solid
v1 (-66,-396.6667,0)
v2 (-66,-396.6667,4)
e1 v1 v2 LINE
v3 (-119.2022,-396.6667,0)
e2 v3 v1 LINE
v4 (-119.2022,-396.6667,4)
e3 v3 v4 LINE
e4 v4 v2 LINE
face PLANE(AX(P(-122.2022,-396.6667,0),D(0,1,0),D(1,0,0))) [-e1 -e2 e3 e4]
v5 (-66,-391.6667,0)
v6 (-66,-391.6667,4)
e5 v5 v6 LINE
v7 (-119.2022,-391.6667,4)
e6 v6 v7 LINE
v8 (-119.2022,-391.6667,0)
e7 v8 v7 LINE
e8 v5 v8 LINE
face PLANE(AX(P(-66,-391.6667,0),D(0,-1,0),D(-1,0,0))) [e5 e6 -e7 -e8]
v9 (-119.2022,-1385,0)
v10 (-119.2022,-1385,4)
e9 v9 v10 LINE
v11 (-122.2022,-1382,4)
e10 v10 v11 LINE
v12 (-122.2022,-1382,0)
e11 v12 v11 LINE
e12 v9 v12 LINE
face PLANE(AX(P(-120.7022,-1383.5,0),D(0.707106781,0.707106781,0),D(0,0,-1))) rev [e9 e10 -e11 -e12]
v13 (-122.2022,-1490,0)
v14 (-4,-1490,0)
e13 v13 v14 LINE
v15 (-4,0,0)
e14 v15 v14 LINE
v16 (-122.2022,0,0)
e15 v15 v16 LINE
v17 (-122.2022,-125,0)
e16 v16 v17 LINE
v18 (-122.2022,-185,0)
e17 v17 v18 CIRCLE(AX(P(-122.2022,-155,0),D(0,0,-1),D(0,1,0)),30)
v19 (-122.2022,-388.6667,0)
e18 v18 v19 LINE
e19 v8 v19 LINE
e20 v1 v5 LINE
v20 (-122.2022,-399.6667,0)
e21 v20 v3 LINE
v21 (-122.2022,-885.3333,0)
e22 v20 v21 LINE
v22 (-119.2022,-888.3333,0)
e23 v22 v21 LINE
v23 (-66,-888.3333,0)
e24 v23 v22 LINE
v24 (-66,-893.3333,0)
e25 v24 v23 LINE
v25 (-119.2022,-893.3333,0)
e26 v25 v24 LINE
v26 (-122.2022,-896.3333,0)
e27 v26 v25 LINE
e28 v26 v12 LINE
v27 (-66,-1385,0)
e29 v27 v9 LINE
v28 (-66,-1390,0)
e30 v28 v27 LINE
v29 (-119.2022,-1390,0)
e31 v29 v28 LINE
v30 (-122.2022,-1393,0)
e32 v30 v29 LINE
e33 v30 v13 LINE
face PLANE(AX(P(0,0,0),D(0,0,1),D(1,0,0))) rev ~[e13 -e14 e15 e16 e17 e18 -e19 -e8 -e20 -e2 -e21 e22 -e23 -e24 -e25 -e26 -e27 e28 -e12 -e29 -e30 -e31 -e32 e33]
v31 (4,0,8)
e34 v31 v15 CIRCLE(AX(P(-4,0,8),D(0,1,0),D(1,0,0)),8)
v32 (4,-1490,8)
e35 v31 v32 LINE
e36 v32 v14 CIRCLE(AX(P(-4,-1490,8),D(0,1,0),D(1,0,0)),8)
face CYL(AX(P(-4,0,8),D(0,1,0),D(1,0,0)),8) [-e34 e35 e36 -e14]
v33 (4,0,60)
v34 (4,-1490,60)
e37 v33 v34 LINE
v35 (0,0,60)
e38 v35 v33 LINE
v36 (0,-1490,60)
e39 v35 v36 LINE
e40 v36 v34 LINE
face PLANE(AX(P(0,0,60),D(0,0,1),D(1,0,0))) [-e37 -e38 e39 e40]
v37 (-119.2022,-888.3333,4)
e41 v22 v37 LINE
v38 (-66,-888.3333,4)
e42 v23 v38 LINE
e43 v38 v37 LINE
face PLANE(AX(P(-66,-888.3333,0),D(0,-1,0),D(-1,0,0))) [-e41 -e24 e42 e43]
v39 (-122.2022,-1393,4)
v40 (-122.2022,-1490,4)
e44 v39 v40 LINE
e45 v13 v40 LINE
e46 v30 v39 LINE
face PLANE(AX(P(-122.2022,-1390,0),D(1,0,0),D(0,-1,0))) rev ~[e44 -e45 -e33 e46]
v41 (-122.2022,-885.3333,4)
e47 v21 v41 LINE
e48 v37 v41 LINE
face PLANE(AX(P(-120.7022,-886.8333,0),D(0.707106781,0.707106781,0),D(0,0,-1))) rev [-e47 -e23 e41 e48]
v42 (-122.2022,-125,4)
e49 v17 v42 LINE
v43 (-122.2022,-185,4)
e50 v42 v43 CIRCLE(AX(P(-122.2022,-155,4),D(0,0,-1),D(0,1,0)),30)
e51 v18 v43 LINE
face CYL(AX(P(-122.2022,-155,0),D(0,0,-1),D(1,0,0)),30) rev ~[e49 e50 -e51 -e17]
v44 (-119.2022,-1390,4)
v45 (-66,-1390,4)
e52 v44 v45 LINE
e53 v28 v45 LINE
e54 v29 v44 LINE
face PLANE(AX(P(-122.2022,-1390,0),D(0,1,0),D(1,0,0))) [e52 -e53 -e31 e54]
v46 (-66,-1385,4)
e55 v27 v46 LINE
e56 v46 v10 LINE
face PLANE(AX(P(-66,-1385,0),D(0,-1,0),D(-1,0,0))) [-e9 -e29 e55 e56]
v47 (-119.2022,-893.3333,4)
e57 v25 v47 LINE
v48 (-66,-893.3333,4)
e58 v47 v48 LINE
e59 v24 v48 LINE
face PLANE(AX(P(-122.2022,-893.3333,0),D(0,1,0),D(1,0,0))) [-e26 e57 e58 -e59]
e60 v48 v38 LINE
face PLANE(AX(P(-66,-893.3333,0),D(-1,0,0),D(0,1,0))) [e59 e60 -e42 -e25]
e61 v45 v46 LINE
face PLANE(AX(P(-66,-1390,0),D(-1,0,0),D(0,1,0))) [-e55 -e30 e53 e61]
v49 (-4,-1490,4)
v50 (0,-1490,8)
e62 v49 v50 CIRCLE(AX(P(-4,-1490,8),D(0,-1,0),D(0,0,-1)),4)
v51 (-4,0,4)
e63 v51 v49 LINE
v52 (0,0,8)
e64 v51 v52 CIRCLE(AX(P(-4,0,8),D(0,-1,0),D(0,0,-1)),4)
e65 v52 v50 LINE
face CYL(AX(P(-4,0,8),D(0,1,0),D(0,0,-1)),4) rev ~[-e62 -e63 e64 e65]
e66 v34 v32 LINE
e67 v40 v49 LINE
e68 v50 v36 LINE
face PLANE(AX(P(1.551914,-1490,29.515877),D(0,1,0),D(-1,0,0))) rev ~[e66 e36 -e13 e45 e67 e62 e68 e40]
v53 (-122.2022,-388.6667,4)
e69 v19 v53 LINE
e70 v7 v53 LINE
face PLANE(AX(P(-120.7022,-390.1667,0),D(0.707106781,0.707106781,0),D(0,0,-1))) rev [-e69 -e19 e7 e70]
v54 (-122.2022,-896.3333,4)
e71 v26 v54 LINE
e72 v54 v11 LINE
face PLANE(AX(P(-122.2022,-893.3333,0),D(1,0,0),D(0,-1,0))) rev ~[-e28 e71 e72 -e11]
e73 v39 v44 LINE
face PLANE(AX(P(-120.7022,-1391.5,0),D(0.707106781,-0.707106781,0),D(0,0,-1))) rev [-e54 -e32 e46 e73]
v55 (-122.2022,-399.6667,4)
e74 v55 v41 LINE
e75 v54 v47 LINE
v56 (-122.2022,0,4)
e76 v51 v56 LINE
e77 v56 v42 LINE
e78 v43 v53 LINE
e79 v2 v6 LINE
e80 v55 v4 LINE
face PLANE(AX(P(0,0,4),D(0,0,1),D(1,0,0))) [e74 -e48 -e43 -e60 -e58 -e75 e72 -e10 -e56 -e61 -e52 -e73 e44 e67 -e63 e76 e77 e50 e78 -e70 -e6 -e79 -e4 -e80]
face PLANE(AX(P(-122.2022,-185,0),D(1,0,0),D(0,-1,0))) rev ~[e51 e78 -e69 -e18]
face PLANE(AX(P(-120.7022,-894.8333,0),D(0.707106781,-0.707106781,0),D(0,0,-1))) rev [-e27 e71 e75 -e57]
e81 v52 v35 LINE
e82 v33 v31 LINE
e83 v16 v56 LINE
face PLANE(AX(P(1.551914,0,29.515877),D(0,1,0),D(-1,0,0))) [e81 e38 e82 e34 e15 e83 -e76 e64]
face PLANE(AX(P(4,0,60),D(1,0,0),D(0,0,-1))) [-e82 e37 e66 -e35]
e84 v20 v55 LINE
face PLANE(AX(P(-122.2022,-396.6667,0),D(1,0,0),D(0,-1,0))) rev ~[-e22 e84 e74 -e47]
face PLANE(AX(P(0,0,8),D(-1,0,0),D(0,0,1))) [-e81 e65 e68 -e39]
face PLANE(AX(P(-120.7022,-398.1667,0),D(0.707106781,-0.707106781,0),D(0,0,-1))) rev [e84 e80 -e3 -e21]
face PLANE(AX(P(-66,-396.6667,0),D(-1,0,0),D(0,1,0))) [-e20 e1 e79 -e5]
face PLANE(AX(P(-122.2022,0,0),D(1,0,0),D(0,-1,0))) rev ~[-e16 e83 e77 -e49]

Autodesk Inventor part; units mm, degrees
ref_plane "YZ Plane" through (0, 0, 0) normal (1, 0, 0) x (0, 1, 0)
ref_plane "XZ Plane" through (0, 0, 0) normal (0, 1, 0) x (-1, 0, 0)
ref_plane "XY Plane" through (0, 0, 0) normal (0, 0, 1) x (1, 0, 0)
sketch "Sketch1" plane through (0, 0, 0) normal (0, 0, 1) x (1, 0, 0)
  line L0 (0, 0) -> (-122.2022, 0)
  line L1 (-122.2022, 0) -> (-122.2022, -1490)
  line L2 (-122.2022, -1490) -> (0, -1490)
  line L3 (0, -1490) -> (0, 0)
  line L4 (-122.2022, -1390) -> (-66, -1390)
  line L5 (-66, -1390) -> (-66, -1385)
  line L6 (-66, -1385) -> (-122.2022, -1385)
  line L7 (-122.2022, -1385) -> (-122.2022, -1390)
  line L8 (-122.2022, -893.3333) -> (-66, -893.3333)
  line L9 (-66, -893.3333) -> (-66, -888.3333)
  line L10 (-66, -888.3333) -> (-122.2022, -888.3333)
  line L11 (-122.2022, -888.3333) -> (-122.2022, -893.3333)
  line L12 (-122.2022, -396.6667) -> (-66, -396.6667)
  line L13 (-66, -396.6667) -> (-66, -391.6667)
  line L14 (-66, -391.6667) -> (-122.2022, -391.6667)
  line L15 (-122.2022, -391.6667) -> (-122.2022, -396.6667)
  circle A0 centre (-122.2022, -155) radius 30
  point P0 (-122.2022, -1385)
  point P1 (-122.2022, -125)
  point P2 (-122.2022, -185)
  dimension "d0" = 1490
  dimension "d1" = 122.2022
  dimension "d2" = 5
  dimension "d4" = 100
  dimension "d7" = 496.6667
  dimension "d23" = 66
  dimension "d28" = 60
  dimension "d29" = 1335
extrude "Plate1" add sketch "Sketch1" along normal blind 4 contours L3 L2 L1 L4 L5 L6 L8 L9 L10 L12 L13 L14 A0 L0
sketch "Sketch2" plane through (4, 0, 0) normal (-1, 0, 0) x (0, -1, 0)
  line L0 (1490, 0) -> (0, 0)
  line L1 (0, 0) -> (0, 60)
  line L2 (0, 60) -> (1490, 60)
  line L3 (1490, 60) -> (1490, 0)
edge flange "Flange1" height 60 angle 90 thickness 4 bend radius 4 thickness toward (-1, 0, 0) relief tear relief width 4 relief depth 2 edges at (0, -745, 4) wall of the first edge with corners at (4, -1490, 0) (4, 0, 0) (4, 0, 60) (4, -1490, 60)
bend "Bend1"
corner "Corner1"
chamfer "Corner Chamfer1" distance 3 angle 45 6 edges at (-122.2022, -1390, 2) (-122.2022, -1385, 2) (-122.2022, -893.3333, 2) (-122.2022, -888.3333, 2) (-122.2022, -391.6667, 2) (-122.2022, -396.6667, 2)
equation "\"d0\" = Стрингер_длина"
equation "\"d1\" = стрингер_глубина_7"
equation "\"d2\" = паз_под_стрингер_толщина"
equation "\"d7\" = 0.333333 * Стрингер_длина"
equation "\"d23\" = паз_под_стрингер_глубина - Thickness"
equation "\"d28\" = 2 * радиус_выреза_под_сварку"
equation "\"d12\" = Thickness"
equation "\"d13\" = BendReliefWidth"
equation "\"d14\" = BendReliefDepth"
equation "\"d15\" = MinimumRemnant"
equation "\"d16\" = TransitionRadius"
equation "\"d17\" = ребро_усилителей"
equation "\"d19\" = BendRadius"
equation "\"d20\" = CornerReliefSize"
equation "\"d21\" = GapSize"
equation "\"d22\" = JacobiRadiusSize"
equation "\"BendRadius\" = Thickness"
equation "\"BendReliefWidth\" = Thickness"
equation "\"BendReliefDepth\" = 0.5 * Thickness"
equation "\"CornerReliefSize\" = 4 * Thickness"
equation "\"MinimumRemnant\" = 2 * Thickness"
equation "\"TransitionRadius\" = BendRadius"
equation "\"JacobiRadiusSize\" = BendRadius"
equation "\"GapSize\" = Thickness"
equation "\"Стрингер_длина\" = 1490"
equation "\"стрингер_глубина_7\" = 122.202218"
equation "\"паз_под_стрингер_толщина\" = 5"
equation "\"паз_под_стрингер_глубина\" = 70"
equation "\"Thickness\" = 4"
equation "\"радиус_выреза_под_сварку\" = 30"
equation "\"ребро_усилителей\" = 60"
properties part number "0381 GBK stringer 7" material "Steel"
